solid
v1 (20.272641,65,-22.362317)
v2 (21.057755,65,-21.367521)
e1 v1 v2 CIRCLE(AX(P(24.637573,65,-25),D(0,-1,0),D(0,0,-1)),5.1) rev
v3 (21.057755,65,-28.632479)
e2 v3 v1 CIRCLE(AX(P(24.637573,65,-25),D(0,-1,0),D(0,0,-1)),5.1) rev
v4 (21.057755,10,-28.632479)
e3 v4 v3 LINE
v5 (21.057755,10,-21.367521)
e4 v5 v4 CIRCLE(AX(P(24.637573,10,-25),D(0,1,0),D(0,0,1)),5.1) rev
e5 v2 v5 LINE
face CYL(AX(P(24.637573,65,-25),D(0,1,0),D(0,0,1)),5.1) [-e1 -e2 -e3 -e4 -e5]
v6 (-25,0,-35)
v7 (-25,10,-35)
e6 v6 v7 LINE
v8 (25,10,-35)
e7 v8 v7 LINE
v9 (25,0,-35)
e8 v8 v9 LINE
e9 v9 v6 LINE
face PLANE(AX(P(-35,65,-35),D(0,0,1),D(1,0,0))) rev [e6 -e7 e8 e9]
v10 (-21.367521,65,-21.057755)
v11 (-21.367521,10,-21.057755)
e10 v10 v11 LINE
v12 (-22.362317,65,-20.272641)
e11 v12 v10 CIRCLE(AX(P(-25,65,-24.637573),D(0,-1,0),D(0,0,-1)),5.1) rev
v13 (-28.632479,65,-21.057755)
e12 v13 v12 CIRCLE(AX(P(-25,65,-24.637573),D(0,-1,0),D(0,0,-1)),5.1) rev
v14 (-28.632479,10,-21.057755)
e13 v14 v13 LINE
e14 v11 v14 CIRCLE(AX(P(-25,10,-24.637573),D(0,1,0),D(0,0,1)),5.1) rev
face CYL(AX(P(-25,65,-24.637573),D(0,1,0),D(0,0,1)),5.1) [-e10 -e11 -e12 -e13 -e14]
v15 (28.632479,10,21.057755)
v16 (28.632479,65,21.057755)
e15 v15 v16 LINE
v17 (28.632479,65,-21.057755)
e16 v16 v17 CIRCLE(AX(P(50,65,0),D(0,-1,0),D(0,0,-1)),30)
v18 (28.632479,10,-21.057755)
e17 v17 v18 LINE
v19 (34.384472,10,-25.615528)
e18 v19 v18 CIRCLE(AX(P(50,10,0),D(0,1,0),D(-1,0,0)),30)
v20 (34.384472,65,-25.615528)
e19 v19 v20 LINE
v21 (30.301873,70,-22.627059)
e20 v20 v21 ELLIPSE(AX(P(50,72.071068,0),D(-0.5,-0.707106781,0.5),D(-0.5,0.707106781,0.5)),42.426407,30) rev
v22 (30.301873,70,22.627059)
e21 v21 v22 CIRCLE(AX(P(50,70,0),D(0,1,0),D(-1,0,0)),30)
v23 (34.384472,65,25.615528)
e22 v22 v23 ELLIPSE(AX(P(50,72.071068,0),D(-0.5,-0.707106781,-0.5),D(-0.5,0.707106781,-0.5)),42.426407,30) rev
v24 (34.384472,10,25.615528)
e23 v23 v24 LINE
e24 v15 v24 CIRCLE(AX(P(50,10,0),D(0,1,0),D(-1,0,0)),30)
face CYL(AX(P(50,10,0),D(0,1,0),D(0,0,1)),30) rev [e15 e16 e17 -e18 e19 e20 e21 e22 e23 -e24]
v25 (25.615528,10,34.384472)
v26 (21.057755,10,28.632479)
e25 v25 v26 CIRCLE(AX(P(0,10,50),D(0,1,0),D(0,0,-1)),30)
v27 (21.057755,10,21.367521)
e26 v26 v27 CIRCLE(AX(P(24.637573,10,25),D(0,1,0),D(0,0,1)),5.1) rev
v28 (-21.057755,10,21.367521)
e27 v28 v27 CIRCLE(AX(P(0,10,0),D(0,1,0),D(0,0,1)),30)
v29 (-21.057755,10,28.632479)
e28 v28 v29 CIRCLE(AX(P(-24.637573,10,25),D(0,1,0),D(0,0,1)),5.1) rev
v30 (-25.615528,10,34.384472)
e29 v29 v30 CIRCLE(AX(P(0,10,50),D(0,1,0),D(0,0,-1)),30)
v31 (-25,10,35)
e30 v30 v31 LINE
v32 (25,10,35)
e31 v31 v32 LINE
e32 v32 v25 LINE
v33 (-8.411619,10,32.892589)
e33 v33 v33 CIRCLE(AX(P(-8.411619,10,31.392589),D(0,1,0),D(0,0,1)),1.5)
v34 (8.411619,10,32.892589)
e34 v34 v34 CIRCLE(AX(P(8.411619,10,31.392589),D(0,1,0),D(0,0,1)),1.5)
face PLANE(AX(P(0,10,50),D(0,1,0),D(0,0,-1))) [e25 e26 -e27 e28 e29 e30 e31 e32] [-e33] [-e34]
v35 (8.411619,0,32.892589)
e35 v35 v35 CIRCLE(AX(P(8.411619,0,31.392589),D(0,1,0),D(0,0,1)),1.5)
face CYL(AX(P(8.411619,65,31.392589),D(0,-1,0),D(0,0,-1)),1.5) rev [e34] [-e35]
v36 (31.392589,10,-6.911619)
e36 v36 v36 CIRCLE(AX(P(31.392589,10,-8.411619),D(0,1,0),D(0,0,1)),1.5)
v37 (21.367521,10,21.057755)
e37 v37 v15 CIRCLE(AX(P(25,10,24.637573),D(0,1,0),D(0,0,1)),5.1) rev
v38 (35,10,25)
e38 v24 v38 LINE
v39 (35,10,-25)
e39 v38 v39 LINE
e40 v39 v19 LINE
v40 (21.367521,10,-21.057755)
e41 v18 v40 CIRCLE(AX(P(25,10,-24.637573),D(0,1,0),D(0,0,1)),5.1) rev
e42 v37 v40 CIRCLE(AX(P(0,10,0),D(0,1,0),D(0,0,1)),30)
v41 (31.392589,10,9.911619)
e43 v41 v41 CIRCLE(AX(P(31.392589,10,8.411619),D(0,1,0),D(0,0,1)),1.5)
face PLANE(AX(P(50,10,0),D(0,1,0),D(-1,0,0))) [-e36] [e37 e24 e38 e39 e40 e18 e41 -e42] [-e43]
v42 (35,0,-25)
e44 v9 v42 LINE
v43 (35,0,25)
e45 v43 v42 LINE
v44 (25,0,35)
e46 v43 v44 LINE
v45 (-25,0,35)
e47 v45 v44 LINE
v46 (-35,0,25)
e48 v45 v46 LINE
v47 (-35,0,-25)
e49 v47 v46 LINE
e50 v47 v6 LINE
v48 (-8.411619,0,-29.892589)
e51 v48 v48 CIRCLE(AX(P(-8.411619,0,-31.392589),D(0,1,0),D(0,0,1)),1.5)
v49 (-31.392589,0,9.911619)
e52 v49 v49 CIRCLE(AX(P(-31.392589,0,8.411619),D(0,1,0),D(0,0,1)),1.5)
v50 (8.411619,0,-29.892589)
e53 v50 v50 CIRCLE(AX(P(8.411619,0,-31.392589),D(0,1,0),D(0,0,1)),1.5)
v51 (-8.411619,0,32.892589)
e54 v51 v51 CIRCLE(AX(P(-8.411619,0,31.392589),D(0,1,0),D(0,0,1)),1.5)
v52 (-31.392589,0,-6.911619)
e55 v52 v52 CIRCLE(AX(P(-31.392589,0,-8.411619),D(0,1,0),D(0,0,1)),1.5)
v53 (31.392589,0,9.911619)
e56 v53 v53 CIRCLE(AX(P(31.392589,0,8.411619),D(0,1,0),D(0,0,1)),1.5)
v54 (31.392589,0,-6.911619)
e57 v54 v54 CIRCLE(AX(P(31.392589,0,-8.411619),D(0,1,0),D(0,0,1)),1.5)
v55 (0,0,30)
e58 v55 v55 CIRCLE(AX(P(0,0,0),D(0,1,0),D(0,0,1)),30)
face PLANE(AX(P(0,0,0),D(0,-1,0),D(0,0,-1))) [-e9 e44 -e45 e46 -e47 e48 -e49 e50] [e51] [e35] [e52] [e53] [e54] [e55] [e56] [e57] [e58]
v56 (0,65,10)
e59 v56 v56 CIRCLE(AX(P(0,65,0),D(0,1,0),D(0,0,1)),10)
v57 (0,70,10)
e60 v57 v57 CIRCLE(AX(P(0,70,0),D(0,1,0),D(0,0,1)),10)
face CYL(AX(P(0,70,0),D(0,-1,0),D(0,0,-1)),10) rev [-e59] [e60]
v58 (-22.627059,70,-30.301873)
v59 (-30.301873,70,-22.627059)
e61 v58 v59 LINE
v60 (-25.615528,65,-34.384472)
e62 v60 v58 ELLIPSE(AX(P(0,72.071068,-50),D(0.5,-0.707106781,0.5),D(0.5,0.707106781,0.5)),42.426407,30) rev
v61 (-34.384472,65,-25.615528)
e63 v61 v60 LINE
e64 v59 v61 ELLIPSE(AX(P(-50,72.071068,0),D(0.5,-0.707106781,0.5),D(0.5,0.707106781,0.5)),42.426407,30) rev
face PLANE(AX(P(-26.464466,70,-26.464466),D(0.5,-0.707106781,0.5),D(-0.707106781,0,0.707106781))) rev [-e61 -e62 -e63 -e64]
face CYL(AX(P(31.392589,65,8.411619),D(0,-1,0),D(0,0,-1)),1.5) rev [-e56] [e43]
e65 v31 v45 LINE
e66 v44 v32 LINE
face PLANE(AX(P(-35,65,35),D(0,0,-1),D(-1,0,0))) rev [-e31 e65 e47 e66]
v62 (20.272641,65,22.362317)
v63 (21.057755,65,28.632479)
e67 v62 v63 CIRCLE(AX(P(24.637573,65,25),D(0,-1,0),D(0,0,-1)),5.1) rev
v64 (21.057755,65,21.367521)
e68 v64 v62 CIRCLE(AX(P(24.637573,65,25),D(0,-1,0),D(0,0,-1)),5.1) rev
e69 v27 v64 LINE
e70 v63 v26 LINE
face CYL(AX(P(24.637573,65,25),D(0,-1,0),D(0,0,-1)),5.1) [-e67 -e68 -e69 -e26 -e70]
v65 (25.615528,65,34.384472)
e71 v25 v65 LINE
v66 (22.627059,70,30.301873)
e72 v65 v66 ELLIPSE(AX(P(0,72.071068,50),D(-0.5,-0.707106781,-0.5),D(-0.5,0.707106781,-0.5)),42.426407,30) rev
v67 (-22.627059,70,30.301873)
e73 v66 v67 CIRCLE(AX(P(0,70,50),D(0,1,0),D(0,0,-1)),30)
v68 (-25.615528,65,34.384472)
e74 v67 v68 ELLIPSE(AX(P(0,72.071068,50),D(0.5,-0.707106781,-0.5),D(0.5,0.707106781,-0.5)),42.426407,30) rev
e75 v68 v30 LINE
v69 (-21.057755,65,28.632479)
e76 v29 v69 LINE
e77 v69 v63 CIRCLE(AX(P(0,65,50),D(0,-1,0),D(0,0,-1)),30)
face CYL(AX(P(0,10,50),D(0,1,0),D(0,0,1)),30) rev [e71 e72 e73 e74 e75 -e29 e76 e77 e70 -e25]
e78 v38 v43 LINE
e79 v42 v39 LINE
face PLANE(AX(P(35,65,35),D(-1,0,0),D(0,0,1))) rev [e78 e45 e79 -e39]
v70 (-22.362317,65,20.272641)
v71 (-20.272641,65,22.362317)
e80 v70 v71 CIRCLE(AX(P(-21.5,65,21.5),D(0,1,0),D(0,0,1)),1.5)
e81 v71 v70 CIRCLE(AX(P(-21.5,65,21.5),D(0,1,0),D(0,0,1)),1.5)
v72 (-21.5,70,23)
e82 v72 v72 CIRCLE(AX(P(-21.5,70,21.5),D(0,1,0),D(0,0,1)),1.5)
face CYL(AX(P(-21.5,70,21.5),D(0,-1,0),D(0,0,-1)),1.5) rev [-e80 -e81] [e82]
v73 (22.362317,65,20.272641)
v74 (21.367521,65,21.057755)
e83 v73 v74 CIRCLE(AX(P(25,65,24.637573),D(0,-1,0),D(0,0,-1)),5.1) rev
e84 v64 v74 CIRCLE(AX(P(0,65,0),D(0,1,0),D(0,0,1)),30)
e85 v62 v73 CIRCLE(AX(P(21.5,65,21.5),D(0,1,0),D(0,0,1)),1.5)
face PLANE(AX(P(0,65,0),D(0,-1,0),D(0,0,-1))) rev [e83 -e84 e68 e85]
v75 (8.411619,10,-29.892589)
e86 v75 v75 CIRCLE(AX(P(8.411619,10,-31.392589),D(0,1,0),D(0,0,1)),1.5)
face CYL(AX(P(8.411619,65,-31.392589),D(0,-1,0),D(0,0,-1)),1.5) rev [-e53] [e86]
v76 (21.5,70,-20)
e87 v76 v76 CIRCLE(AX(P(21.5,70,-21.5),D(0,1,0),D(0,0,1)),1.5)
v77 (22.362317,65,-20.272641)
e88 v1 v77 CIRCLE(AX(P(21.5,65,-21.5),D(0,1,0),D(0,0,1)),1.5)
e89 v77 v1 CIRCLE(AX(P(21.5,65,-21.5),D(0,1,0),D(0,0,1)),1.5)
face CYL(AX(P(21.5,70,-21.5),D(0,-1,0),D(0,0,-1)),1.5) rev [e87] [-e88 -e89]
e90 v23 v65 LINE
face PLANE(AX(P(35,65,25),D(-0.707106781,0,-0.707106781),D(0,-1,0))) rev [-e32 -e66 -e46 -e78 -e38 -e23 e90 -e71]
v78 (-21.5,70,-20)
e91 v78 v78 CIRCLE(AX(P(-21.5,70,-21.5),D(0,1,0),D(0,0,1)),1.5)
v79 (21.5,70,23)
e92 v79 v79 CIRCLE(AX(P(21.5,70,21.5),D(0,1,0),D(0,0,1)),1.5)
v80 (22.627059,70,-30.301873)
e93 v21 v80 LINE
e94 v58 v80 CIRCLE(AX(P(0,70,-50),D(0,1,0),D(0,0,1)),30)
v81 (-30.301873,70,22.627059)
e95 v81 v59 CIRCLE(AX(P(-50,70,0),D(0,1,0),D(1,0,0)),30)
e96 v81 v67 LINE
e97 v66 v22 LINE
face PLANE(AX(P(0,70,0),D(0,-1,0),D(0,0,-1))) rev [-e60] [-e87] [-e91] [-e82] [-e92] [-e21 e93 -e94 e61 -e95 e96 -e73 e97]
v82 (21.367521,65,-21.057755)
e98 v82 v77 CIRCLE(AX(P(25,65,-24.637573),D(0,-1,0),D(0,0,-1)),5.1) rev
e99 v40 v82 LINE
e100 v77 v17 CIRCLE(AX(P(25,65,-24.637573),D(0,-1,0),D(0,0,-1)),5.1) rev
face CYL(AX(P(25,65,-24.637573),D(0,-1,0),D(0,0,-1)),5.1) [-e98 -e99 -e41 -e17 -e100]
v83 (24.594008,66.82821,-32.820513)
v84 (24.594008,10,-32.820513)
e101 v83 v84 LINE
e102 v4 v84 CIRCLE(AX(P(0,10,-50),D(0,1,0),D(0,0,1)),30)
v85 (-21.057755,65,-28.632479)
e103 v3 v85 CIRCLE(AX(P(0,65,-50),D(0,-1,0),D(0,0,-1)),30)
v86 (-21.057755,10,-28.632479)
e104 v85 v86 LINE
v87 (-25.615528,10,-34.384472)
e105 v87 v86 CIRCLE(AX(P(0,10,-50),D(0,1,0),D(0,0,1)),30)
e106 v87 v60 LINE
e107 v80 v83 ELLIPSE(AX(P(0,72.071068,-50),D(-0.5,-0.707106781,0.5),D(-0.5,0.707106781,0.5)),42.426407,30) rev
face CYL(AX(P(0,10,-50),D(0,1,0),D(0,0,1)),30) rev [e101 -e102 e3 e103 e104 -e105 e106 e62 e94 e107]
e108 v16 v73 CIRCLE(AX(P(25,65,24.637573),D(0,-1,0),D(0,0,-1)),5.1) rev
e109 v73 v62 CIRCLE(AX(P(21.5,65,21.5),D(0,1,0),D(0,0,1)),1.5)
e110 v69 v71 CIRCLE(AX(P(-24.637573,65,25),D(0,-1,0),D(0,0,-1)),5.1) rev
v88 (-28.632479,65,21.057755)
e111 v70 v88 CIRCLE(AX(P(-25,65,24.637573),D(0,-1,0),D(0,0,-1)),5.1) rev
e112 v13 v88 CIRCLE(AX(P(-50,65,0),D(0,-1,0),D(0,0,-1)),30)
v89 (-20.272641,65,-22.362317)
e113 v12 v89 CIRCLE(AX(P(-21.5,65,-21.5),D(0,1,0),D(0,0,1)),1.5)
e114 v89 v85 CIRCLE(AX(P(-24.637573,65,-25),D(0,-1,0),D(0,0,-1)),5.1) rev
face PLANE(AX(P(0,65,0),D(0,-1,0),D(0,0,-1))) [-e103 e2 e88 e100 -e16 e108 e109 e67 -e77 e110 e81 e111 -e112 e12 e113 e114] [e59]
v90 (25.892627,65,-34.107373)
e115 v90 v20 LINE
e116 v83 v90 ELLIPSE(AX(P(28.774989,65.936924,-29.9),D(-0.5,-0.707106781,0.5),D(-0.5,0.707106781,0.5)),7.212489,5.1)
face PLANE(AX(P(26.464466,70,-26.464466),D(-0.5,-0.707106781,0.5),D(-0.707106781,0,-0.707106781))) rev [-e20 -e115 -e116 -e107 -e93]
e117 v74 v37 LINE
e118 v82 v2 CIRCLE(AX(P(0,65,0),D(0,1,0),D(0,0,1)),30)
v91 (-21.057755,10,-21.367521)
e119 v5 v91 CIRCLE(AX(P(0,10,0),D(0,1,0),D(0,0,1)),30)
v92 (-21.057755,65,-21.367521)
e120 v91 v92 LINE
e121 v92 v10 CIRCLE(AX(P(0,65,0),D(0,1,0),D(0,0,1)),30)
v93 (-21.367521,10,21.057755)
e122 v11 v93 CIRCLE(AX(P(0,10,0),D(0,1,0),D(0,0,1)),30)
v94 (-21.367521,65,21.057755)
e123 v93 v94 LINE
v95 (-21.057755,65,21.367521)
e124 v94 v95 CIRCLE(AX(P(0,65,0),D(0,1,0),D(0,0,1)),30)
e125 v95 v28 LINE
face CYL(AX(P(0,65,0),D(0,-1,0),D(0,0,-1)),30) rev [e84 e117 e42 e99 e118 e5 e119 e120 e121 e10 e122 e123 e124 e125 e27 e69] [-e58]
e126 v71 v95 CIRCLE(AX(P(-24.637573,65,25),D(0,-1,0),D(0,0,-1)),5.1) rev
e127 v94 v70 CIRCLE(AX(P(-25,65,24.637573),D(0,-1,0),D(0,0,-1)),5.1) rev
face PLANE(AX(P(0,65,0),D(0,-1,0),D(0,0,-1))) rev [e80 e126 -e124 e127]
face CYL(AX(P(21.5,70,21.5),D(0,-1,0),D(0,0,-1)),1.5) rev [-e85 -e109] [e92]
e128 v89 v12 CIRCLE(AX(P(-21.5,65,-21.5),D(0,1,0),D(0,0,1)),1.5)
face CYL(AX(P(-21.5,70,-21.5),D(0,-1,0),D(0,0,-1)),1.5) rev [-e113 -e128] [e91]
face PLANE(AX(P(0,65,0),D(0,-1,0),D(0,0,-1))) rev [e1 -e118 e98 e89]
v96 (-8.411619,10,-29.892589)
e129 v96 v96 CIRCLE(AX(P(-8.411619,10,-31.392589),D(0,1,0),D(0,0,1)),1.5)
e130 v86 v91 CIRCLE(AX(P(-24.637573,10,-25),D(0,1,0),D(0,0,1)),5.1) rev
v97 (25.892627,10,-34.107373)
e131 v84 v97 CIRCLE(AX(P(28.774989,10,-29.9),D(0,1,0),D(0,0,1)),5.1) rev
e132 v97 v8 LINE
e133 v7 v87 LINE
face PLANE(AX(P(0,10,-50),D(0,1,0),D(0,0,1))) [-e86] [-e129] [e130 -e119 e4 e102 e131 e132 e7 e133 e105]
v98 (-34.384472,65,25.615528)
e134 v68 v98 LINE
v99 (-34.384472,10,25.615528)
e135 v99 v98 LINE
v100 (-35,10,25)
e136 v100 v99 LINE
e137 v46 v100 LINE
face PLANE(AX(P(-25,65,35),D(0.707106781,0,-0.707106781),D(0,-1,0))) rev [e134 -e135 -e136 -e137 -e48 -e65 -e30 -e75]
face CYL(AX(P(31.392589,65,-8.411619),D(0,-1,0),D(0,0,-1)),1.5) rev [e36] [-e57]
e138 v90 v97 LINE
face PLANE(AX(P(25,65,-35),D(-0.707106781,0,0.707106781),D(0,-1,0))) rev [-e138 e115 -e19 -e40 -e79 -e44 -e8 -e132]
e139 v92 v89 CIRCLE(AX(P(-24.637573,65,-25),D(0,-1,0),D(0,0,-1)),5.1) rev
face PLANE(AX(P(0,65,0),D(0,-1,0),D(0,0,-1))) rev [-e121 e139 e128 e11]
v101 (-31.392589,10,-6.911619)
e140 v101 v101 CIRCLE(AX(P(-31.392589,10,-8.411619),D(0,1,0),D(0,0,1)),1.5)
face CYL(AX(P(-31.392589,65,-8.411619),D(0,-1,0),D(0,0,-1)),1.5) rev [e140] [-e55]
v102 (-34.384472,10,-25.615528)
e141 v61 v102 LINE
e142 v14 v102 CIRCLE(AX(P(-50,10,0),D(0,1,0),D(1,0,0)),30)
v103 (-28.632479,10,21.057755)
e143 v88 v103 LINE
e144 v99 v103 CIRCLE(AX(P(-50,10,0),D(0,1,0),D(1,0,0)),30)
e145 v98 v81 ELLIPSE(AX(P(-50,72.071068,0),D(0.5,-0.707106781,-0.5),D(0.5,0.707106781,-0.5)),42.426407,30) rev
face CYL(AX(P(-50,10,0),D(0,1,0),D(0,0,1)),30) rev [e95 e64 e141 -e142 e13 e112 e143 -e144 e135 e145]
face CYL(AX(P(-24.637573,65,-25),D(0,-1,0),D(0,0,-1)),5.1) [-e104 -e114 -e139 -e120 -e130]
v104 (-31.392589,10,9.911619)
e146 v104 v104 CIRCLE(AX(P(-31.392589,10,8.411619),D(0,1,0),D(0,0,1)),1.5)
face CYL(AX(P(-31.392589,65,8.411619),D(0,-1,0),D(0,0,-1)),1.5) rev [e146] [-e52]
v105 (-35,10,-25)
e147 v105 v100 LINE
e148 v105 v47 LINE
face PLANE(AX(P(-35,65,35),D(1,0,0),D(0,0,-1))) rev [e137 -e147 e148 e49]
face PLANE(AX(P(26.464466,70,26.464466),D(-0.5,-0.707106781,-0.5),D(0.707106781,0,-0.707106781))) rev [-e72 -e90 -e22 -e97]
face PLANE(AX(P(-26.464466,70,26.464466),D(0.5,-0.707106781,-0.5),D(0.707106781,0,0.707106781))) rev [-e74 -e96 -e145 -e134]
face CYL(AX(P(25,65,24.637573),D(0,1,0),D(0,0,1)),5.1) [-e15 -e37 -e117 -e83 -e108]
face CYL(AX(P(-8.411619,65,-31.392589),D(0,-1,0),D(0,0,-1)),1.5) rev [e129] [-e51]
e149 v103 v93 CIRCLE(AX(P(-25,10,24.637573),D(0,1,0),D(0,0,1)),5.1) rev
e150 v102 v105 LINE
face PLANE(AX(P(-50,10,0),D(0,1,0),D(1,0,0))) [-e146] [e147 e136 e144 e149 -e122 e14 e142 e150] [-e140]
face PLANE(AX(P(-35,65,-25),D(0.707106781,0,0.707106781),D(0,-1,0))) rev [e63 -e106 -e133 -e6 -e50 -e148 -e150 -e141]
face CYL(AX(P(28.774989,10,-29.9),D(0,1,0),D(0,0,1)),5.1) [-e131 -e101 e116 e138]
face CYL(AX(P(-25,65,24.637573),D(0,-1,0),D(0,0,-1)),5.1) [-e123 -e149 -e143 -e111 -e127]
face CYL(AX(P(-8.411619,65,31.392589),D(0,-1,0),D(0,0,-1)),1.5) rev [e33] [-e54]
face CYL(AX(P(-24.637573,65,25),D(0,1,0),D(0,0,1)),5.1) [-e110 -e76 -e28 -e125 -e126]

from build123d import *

# Parameters (mm, degrees)
SKETCH1_W           = 70
SKETCH1_H           = 70
SKETCH1_R           = 30
SKETCH1_R_2         = 1.5
BOSS_EXTRUDE1_DEPTH = 65
SKETCH2_W           = 70
SKETCH2_H           = 70
SKETCH2_R           = 1.5
SKETCH2_R_2         = 10
BOSS_EXTRUDE2_DEPTH = 5
SKETCH3_R           = 30
CUT_EXTRUDE1_DEPTH  = 60
CIRPATTERN1_COUNT   = 4
FILLET2_R           = 5.1
CHAMFER1_SIZE       = 10
CHAMFER2_SIZE       = 5


with BuildPart() as part:
    # Sketch1 → Boss-Extrude1 (new body)
    with BuildSketch(Plane(origin=(0, 0, 0), x_dir=(1, 0, 0), z_dir=(0, 1, 0))):
        Rectangle(SKETCH1_W, SKETCH1_H)
        with Locations(Location((0, 0, 0), (0, 0, 270))):
            Circle(SKETCH1_R, mode=Mode.SUBTRACT)
        with Locations(Location((-8.411618966, 31.392589354, 0), (0, 0, 270))):
            Circle(SKETCH1_R_2, mode=Mode.SUBTRACT)
        with Locations(Location((8.411618966, 31.392589354, 0), (0, 0, 270))):
            Circle(SKETCH1_R_2, mode=Mode.SUBTRACT)
        with Locations(Location((31.392589354, 8.411618966, 0), (0, 0, 270))):
            Circle(SKETCH1_R_2, mode=Mode.SUBTRACT)
        with Locations(Location((31.392589354, -8.411618966, 0), (0, 0, 270))):
            Circle(SKETCH1_R_2, mode=Mode.SUBTRACT)
        with Locations(Location((8.411618966, -31.392589354, 0), (0, 0, 270))):
            Circle(SKETCH1_R_2, mode=Mode.SUBTRACT)
        with Locations(Location((-8.411618966, -31.392589354, 0), (0, 0, 270))):
            Circle(SKETCH1_R_2, mode=Mode.SUBTRACT)
        with Locations(Location((-31.392589354, -8.411618966, 0), (0, 0, 270))):
            Circle(SKETCH1_R_2, mode=Mode.SUBTRACT)
        with Locations(Location((-31.392589354, 8.411618966, 0), (0, 0, 270))):
            Circle(SKETCH1_R_2, mode=Mode.SUBTRACT)
    extrude(amount=BOSS_EXTRUDE1_DEPTH)

    # Sketch2 → Boss-Extrude2 (add)
    with BuildSketch(Plane(origin=(0, 65, 0), x_dir=(1, 0, 0), z_dir=(0, 1, 0))):
        Rectangle(SKETCH2_W, SKETCH2_H)
        with Locations(Location((0, 32.5, 0), (0, 0, 270))):
            Circle(SKETCH2_R, mode=Mode.SUBTRACT)
        with Locations(Location((16.25, 28.145825623, 0), (0, 0, 270))):
            Circle(SKETCH2_R, mode=Mode.SUBTRACT)
        with Locations(Location((28.145825623, 16.25, 0), (0, 0, 270))):
            Circle(SKETCH2_R, mode=Mode.SUBTRACT)
        with Locations(Location((32.5, 0, 0), (0, 0, 270))):
            Circle(SKETCH2_R, mode=Mode.SUBTRACT)
        with Locations(Location((28.145825623, -16.25, 0), (0, 0, 270))):
            Circle(SKETCH2_R, mode=Mode.SUBTRACT)
        with Locations(Location((16.25, -28.145825623, 0), (0, 0, 270))):
            Circle(SKETCH2_R, mode=Mode.SUBTRACT)
        with Locations(Location((0, -32.5, 0), (0, 0, 270))):
            Circle(SKETCH2_R, mode=Mode.SUBTRACT)
        with Locations(Location((-16.25, -28.145825623, 0), (0, 0, 270))):
            Circle(SKETCH2_R, mode=Mode.SUBTRACT)
        with Locations(Location((-28.145825623, -16.25, 0), (0, 0, 270))):
            Circle(SKETCH2_R, mode=Mode.SUBTRACT)
        with Locations(Location((-32.5, 0, 0), (0, 0, 270))):
            Circle(SKETCH2_R, mode=Mode.SUBTRACT)
        with Locations(Location((-28.145825623, 16.25, 0), (0, 0, 270))):
            Circle(SKETCH2_R, mode=Mode.SUBTRACT)
        with Locations(Location((-16.25, 28.145825623, 0), (0, 0, 270))):
            Circle(SKETCH2_R, mode=Mode.SUBTRACT)
        with Locations(Location((0, 0, 0), (0, 0, 270))):
            Circle(SKETCH2_R_2, mode=Mode.SUBTRACT)
        with Locations(Location((-21.5, 21.5, 0), (0, 0, 27.946923368))):
            Circle(SKETCH2_R, mode=Mode.SUBTRACT)
        with Locations(Location((21.5, 21.5, 0), (0, 0, 152.053076632))):
            Circle(SKETCH2_R, mode=Mode.SUBTRACT)
        with Locations(Location((21.5, -21.5, 0), (0, 0, 62.053076632))):
            Circle(SKETCH2_R, mode=Mode.SUBTRACT)
        with Locations(Location((-21.5, -21.5, 0), (0, 0, 117.946923368))):
            Circle(SKETCH2_R, mode=Mode.SUBTRACT)
    extrude(amount=BOSS_EXTRUDE2_DEPTH)

    # Sketch3 → Cut-Extrude1 (cut)
    with BuildSketch(Plane(origin=(0, 70, 0), x_dir=(1, 0, 0), z_dir=(0, 1, 0))):
        with Locations((0, 50)):
            Circle(SKETCH3_R)
    cut_extrude1 = extrude(amount=-CUT_EXTRUDE1_DEPTH, mode=Mode.SUBTRACT)

    # CirPattern1: Cut-Extrude1 ×4 about axis
    cirpattern1_axis = Axis((0, 0, 0), (0, 1, 0))
    for i in range(1, CIRPATTERN1_COUNT):
        add(cut_extrude1.rotate(cirpattern1_axis, i * 360 / CIRPATTERN1_COUNT), mode=Mode.SUBTRACT)

    # Fillet2
    # the kernel refuses this fillet: 5.1 mm, written as the material it takes off along each edge
    with BuildSketch(Plane(origin=(25.980762114, 10, -35), x_dir=(1, 0, 0), z_dir=(0, 1, 0))) as fillet2_piece_1:
        with BuildLine():
            CenterArc((2.794227026, -5.1), FILLET2_R, 90, 55.064804049)
            ThreePointArc((-1.386754302, -2.179487179), (-0.669907143, -1.104676981), (0, 0))
            Line((0, 0), (2.794227026, 0))
        make_face()
    extrude(amount=66.985567566, mode=Mode.SUBTRACT)
    with BuildSketch(Plane(origin=(16.583123952, 65, -25), x_dir=(0.7763821649146441, 0, 0.6302624326440933), z_dir=(0, -1, 0)), Plane(origin=(16.583123952, 65, 25), x_dir=(0.776382164914642, 0, 0.6302624326440961), z_dir=(0, -1, 0)), Plane(origin=(25, 65, 16.583123952), x_dir=(-0.6302624326440963, 0, 0.7763821649146417), z_dir=(0, -1, 0)), Plane(origin=(-25, 65, 16.583123952), x_dir=(-0.630262432644093, 0, 0.7763821649146444), z_dir=(0, -1, 0))) as fillet2_piece_2:
        with BuildLine():
            CenterArc((6.253330537, -5.076416608), FILLET2_R, 95.512177233, 90.836671542)
            ThreePointArc((1.184608644, -5.640383249), (0.728068224, -2.79167812), (0, 0))
            ThreePointArc((0, 0), (2.881719141, -0.138725834), (5.763438283, 0))
        make_face()
    extrude(amount=55, mode=Mode.SUBTRACT)
    with BuildSketch(Plane(origin=(-16.583123952, 65, -25), x_dir=(-0.7763821649146441, 0, 0.6302624326440932), z_dir=(0, -1, 0)), Plane(origin=(-16.583123952, 65, 25), x_dir=(-0.7763821649146462, 0, 0.6302624326440908), z_dir=(0, -1, 0)), Plane(origin=(25, 65, -16.583123952), x_dir=(-0.6302624326440941, 0, -0.7763821649146434), z_dir=(0, -1, 0)), Plane(origin=(-25, 65, -16.583123952), x_dir=(-0.6302624326440903, 0, -0.7763821649146465), z_dir=(0, -1, 0))) as fillet2_piece_3:
        with BuildLine():
            CenterArc((6.253330537, 5.076416608), FILLET2_R, 173.651151224, 90.836671542)
            ThreePointArc((1.184608644, 5.640383249), (0.728068224, 2.79167812), (0, 0))
            ThreePointArc((0, 0), (2.881719141, 0.138725834), (5.763438283, 0))
        make_face()
    extrude(amount=55, mode=Mode.SUBTRACT)

    # Chamfer1
    # the kernel refuses this chamfer: 10 mm, written as the material it takes off along each edge
    with BuildSketch(Plane(origin=(35, -25.71682988, 35), x_dir=(-0.9996219169112968, 0, 0.027495876610586317), z_dir=(0, 1, 0)), Plane(origin=(-35, 95.71682988, 35), x_dir=(0.9996219169112968, 0, 0.027495876610586317), z_dir=(0, -1, 0))) as chamfer1_piece_1:
        Polygon((CHAMFER1_SIZE * 0.999621916911, -CHAMFER1_SIZE * 0.0274958766106), (-CHAMFER1_SIZE * 0.0274958766106, -CHAMFER1_SIZE * 0.999621916911), (0, 0), align=None)
    extrude(amount=121.433659759, mode=Mode.SUBTRACT)
    with BuildSketch(Plane(origin=(35, -25.71682988, -35), x_dir=(-0.9996219169112968, 0, -0.027495876610586317), z_dir=(0, 1, 0)), Plane(origin=(-35, 95.71682988, -35), x_dir=(0.9996219169112968, 0, -0.027495876610586317), z_dir=(0, -1, 0))) as chamfer1_piece_2:
        Polygon((CHAMFER1_SIZE * 0.999621916911, CHAMFER1_SIZE * 0.0274958766106), (-CHAMFER1_SIZE * 0.0274958766106, CHAMFER1_SIZE * 0.999621916911), (0, 0), align=None)
    extrude(amount=121.433659759, mode=Mode.SUBTRACT)

    # Chamfer2
    chamfer2_edges = [part.edges().sort_by_distance(p)[0] for p in [
        (-30, 70, 30),
        (30, 70, 30),
        (30.138549403, 70, -29.861450597),
        (-30, 70, -30),
    ]]
    chamfer(chamfer2_edges, length=CHAMFER2_SIZE)


solid = part.part
